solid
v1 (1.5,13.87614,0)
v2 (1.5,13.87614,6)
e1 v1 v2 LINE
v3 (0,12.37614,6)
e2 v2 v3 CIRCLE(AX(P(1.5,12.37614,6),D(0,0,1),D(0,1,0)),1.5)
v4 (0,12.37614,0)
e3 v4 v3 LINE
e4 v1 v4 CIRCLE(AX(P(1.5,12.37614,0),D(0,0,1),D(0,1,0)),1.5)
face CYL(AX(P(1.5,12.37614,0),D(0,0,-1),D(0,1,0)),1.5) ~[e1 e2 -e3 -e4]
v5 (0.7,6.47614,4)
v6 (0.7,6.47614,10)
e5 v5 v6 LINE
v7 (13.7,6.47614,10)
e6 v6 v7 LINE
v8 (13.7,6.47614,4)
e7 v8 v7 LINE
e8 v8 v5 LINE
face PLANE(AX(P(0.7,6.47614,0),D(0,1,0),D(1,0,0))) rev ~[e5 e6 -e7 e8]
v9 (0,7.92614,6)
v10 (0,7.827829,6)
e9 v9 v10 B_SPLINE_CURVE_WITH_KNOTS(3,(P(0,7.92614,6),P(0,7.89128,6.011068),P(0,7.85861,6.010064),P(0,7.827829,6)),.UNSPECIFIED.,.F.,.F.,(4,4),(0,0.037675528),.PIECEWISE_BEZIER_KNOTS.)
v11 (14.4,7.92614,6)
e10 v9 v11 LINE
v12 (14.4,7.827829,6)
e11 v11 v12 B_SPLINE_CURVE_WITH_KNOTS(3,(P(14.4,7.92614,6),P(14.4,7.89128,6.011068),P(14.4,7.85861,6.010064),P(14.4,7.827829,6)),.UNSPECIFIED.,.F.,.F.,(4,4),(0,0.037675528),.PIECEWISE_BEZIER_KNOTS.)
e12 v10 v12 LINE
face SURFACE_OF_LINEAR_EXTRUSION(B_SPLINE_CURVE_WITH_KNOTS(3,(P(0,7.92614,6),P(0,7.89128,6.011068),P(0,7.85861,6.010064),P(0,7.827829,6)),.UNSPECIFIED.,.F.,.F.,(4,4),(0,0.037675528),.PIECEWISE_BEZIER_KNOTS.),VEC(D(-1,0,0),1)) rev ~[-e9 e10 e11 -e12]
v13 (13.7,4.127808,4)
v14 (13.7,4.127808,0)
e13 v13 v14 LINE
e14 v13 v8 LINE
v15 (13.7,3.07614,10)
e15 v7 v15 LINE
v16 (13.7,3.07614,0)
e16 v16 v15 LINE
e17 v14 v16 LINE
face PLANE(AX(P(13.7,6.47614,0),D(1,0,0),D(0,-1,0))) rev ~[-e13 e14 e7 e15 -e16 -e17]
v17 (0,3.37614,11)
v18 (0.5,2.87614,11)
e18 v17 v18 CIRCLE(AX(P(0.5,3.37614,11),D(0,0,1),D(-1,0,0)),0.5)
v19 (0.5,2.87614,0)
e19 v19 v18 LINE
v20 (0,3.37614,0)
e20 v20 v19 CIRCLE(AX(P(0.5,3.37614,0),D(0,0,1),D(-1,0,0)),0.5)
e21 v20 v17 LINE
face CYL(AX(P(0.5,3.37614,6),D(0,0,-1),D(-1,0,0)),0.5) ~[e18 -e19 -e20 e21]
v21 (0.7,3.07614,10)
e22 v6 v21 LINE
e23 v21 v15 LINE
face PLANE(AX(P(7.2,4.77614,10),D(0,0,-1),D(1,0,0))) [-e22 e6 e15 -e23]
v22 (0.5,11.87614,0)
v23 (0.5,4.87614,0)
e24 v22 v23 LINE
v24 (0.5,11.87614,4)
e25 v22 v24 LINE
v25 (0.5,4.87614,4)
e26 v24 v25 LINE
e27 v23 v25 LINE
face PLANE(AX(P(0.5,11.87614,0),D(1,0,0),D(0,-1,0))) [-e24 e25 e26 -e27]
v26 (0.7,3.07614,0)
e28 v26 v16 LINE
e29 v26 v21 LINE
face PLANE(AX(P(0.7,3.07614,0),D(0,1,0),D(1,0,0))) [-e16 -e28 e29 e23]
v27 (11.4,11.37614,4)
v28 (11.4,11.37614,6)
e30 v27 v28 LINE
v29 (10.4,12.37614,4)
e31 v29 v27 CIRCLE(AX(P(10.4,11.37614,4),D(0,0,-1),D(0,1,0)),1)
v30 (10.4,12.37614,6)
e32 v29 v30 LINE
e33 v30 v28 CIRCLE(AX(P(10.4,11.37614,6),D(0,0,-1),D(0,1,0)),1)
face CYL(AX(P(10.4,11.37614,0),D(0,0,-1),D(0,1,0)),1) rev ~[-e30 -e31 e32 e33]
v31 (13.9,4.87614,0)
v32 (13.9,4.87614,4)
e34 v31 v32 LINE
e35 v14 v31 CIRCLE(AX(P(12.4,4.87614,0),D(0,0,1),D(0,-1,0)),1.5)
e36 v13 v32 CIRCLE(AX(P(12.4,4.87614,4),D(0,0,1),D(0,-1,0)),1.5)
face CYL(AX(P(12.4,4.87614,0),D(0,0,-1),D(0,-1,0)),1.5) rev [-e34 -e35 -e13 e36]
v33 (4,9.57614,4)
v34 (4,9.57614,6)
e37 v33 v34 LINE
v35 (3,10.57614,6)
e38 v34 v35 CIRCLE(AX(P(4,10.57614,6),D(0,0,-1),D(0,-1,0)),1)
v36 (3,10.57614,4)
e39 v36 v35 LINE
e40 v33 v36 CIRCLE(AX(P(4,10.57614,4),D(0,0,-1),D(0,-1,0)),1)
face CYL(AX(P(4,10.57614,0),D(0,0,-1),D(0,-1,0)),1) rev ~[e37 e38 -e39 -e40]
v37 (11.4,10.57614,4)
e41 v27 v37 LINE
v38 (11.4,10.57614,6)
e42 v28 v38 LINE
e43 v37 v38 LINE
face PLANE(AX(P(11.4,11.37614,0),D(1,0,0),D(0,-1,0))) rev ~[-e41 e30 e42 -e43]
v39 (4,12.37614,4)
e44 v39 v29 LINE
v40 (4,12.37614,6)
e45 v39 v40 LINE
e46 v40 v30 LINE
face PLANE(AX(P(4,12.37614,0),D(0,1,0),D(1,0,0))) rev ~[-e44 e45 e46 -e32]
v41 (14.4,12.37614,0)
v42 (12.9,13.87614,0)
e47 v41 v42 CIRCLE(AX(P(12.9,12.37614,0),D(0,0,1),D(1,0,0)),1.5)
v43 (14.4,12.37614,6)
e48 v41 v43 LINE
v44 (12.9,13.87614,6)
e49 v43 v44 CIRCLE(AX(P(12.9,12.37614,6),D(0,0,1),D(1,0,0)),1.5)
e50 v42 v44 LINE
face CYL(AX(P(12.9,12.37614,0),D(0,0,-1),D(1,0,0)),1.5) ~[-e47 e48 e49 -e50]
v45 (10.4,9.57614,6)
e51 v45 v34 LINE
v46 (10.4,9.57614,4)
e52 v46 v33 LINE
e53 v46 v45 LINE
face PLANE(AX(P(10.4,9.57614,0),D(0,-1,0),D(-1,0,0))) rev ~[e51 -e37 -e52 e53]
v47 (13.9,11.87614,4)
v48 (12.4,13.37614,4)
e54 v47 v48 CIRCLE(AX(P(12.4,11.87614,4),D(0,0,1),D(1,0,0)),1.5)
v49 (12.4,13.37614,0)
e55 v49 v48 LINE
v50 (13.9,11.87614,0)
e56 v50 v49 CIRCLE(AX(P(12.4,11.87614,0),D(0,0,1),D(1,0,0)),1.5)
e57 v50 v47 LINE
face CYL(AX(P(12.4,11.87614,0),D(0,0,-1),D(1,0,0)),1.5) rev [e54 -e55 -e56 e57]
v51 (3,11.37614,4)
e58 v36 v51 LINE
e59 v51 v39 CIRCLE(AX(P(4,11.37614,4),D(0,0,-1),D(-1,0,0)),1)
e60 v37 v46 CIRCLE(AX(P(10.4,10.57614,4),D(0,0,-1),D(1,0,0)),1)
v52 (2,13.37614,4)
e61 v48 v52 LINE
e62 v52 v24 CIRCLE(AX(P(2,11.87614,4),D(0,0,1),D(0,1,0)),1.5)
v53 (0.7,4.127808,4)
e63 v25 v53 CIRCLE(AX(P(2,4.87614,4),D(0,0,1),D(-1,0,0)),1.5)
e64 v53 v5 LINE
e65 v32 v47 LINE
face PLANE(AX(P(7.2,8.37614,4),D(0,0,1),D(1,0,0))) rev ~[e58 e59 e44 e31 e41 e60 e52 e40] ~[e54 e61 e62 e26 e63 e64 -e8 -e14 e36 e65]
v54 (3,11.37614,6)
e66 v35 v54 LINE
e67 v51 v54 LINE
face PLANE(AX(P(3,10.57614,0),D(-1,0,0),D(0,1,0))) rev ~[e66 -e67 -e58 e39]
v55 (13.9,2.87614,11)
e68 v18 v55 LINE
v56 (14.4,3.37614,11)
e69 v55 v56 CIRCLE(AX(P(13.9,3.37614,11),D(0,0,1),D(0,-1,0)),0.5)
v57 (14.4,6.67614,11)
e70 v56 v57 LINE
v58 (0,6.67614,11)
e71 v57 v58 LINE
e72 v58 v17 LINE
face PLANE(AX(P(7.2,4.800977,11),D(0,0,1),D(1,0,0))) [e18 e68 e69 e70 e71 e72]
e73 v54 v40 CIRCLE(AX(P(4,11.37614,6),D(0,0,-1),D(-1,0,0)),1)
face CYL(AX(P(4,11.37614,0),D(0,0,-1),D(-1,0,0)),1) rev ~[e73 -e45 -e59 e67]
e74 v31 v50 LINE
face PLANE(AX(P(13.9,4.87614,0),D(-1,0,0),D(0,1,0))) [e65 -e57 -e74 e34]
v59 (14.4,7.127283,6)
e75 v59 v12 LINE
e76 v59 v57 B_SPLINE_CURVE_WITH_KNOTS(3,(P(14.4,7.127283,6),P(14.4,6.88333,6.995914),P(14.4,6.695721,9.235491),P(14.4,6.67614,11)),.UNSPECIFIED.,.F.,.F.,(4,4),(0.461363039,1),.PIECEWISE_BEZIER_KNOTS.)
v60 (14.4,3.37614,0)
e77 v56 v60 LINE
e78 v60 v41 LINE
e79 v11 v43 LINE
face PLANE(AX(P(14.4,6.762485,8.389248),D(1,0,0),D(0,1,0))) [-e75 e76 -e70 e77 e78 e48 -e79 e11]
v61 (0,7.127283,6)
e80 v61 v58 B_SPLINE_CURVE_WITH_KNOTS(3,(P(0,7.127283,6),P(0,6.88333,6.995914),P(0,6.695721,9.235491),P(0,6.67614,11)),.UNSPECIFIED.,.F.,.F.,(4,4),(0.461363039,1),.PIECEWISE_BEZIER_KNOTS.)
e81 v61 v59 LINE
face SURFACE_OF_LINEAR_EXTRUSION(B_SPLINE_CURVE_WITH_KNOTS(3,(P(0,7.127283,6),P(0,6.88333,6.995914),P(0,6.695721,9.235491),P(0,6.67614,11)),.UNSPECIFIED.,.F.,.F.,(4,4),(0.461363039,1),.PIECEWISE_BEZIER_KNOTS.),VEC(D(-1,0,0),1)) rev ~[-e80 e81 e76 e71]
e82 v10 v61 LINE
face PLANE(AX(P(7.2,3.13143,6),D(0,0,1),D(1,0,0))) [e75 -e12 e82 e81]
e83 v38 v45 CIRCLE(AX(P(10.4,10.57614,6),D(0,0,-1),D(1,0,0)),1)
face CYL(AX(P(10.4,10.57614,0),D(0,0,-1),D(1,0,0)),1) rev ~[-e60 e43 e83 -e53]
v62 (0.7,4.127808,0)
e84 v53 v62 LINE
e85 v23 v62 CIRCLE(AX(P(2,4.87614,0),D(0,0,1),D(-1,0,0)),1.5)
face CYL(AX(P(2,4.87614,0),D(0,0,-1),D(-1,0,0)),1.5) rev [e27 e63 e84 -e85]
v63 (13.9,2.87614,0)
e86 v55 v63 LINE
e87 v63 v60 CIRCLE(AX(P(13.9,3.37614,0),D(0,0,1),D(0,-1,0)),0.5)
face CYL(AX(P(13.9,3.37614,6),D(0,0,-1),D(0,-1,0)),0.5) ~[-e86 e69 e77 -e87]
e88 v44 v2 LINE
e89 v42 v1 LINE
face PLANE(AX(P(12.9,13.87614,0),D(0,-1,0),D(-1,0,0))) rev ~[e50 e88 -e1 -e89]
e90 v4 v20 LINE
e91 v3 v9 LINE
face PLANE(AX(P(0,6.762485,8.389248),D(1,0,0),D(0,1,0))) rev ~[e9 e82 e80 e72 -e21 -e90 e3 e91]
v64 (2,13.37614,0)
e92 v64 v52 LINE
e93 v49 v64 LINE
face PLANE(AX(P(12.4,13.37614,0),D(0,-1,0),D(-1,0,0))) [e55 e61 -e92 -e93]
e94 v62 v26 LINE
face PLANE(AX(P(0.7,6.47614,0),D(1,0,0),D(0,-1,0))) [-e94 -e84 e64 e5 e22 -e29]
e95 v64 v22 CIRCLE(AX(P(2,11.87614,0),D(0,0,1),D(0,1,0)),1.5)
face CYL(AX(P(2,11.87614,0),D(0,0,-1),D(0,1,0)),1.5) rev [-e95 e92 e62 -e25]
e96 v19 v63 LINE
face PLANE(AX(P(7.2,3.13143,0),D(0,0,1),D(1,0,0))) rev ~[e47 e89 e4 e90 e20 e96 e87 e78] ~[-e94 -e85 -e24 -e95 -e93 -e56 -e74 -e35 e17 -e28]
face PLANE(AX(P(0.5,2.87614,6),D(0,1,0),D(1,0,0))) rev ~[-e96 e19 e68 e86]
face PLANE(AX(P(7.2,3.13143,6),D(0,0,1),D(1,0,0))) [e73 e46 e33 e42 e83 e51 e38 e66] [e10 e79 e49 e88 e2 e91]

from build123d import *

# Parameters (mm, degrees)
F1_DEPTH = 6
F3_DEPTH = 4
F5_DEPTH = 5
F6_W     = 13
F6_H     = 3.4
F7_DEPTH = 10
F9_DEPTH = 14.4


# Not quite as in the source:
# - a feature names something its author has since deleted; it is built from what else it names


with BuildPart() as f1:
    # F0 (on Top) → F1 (new body)
    with BuildSketch(Plane.XY):
        with BuildLine():
            ThreePointArc((0, 3.3761399509), (0.1464466094, 3.0225865603), (0.5, 2.8761399509))
            Line((0.5, 2.8761399509), (13.9, 2.8761399509))
            ThreePointArc((13.9, 2.8761399509), (14.2535533906, 3.0225865603), (14.4, 3.3761399509))
            Line((14.4, 3.3761399509), (0, 3.3761399509))
        make_face()
        with BuildLine():
            Line((0, 12.3761399509), (0, 3.3761399509))
            Line((0, 3.3761399509), (14.4, 3.3761399509))
            Line((14.4, 3.3761399509), (14.4, 12.3761399509))
            ThreePointArc((14.4, 12.3761399509), (13.9606601718, 13.4368001227), (12.9, 13.8761399509))
            Line((12.9, 13.8761399509), (1.5, 13.8761399509))
            ThreePointArc((1.5, 13.8761399509), (0.4393398282, 13.4368001227), (0, 12.3761399509))
        make_face()
        with BuildLine():
            ThreePointArc((3, 11.3761399509), (3.2928932188, 12.0832467321), (4, 12.3761399509))
            Line((4, 12.3761399509), (10.4, 12.3761399509))
            ThreePointArc((10.4, 12.3761399509), (11.1071067812, 12.0832467321), (11.4, 11.3761399509))
            Line((11.4, 11.3761399509), (11.4, 10.5761399509))
            ThreePointArc((11.4, 10.5761399509), (11.1071067812, 9.8690331698), (10.4, 9.5761399509))
            Line((10.4, 9.5761399509), (4, 9.5761399509))
            ThreePointArc((4, 9.5761399509), (3.2928932188, 9.8690331698), (3, 10.5761399509))
            Line((3, 10.5761399509), (3, 11.3761399509))
        make_face(mode=Mode.SUBTRACT)
    extrude(amount=F1_DEPTH)

    # F2 (on Top) → F3 (cut)
    with BuildSketch(Plane.XY):
        with BuildLine():
            ThreePointArc((13.9, 11.8761399509), (13.4606601718, 12.9368001227), (12.4, 13.3761399509))
            Line((12.4, 13.3761399509), (2, 13.3761399509))
            ThreePointArc((2, 13.3761399509), (0.9393398282, 12.9368001227), (0.5, 11.8761399509))
            Line((0.5, 11.8761399509), (0.5, 4.8761399509))
            ThreePointArc((0.5, 4.8761399509), (0.9393398282, 3.8154797792), (2, 3.3761399509))
            Line((2, 3.3761399509), (12.4, 3.3761399509))
            ThreePointArc((12.4, 3.3761399509), (13.4606601718, 3.8154797792), (13.9, 4.8761399509))
            Line((13.9, 4.8761399509), (13.9, 11.8761399509))
        make_face()
    extrude(amount=F3_DEPTH, mode=Mode.SUBTRACT)

    # F4 (on face) → F5 (join)
    with BuildSketch(Plane.XY.offset(6)):
        with BuildLine():
            Line((14.4, 6.6761399509), (0, 6.6761399509))
            Line((0, 6.6761399509), (0, 3.3761399509))
            ThreePointArc((0, 3.3761399509), (0.1464466094, 3.0225865603), (0.5, 2.8761399509))
            Line((0.5, 2.8761399509), (13.9, 2.8761399509))
            ThreePointArc((13.9, 2.8761399509), (14.2535533906, 3.0225865603), (14.4, 3.3761399509))
            Line((14.4, 3.3761399509), (14.4, 6.6761399509))
        make_face()
    extrude(amount=F5_DEPTH)

    # F6 (on face) → F7 (cut)
    with BuildSketch(Plane(origin=(0, 0, 0), x_dir=(1, 0, 0), z_dir=(0, 0, -1))):
        with Locations((7.2, -4.7761399509)):
            Rectangle(F6_W, F6_H)
    extrude(amount=-F7_DEPTH, mode=Mode.SUBTRACT)

    # F8 (on Right) → F9 (join)
    with BuildSketch(Plane.YZ):
        with BuildLine():
            add(Edge.make_bspline(
                [(7.1272827151, 6), (6.8833303011, 6.9959140901), (6.6957208529, 9.2354907336), (6.6761399509, 11)],
                knots=[0.4613630388, 0.4613630388, 0.4613630388, 0.4613630388, 1, 1, 1, 1], degree=3))
            Line((6.6761399509, 11), (6.6761399509, 6))
            Line((6.6761399509, 6), (7.1272827151, 6))
        make_face()
        with BuildLine():
            add(Edge.make_bspline(
                [(7.9261399509, 6), (7.8912804031, 6.0110682928), (7.8586101723, 6.0100642713), (7.8278293535, 6)],
                knots=[0, 0, 0, 0, 0.0376755281, 0.0376755281, 0.0376755281, 0.0376755281], degree=3))
            Line((7.8278293535, 6), (7.9261399509, 6))
        make_face()
        with BuildLine():
            Line((7.8278293535, 6), (7.1272827151, 6))
            add(Edge.make_bspline(
                [(7.8278293535, 6), (7.6417958125, 5.9391734168), (7.4240615582, 5.2101966849), (7.2160450595, 5.6376356026), (7.1272827151, 6)],
                knots=[0.0376755281, 0.0376755281, 0.0376755281, 0.0376755281, 0.2653794095, 0.4613630388, 0.4613630388, 0.4613630388, 0.4613630388], degree=3))
        make_face()
    extrude(amount=F9_DEPTH)


solid = f1.part
